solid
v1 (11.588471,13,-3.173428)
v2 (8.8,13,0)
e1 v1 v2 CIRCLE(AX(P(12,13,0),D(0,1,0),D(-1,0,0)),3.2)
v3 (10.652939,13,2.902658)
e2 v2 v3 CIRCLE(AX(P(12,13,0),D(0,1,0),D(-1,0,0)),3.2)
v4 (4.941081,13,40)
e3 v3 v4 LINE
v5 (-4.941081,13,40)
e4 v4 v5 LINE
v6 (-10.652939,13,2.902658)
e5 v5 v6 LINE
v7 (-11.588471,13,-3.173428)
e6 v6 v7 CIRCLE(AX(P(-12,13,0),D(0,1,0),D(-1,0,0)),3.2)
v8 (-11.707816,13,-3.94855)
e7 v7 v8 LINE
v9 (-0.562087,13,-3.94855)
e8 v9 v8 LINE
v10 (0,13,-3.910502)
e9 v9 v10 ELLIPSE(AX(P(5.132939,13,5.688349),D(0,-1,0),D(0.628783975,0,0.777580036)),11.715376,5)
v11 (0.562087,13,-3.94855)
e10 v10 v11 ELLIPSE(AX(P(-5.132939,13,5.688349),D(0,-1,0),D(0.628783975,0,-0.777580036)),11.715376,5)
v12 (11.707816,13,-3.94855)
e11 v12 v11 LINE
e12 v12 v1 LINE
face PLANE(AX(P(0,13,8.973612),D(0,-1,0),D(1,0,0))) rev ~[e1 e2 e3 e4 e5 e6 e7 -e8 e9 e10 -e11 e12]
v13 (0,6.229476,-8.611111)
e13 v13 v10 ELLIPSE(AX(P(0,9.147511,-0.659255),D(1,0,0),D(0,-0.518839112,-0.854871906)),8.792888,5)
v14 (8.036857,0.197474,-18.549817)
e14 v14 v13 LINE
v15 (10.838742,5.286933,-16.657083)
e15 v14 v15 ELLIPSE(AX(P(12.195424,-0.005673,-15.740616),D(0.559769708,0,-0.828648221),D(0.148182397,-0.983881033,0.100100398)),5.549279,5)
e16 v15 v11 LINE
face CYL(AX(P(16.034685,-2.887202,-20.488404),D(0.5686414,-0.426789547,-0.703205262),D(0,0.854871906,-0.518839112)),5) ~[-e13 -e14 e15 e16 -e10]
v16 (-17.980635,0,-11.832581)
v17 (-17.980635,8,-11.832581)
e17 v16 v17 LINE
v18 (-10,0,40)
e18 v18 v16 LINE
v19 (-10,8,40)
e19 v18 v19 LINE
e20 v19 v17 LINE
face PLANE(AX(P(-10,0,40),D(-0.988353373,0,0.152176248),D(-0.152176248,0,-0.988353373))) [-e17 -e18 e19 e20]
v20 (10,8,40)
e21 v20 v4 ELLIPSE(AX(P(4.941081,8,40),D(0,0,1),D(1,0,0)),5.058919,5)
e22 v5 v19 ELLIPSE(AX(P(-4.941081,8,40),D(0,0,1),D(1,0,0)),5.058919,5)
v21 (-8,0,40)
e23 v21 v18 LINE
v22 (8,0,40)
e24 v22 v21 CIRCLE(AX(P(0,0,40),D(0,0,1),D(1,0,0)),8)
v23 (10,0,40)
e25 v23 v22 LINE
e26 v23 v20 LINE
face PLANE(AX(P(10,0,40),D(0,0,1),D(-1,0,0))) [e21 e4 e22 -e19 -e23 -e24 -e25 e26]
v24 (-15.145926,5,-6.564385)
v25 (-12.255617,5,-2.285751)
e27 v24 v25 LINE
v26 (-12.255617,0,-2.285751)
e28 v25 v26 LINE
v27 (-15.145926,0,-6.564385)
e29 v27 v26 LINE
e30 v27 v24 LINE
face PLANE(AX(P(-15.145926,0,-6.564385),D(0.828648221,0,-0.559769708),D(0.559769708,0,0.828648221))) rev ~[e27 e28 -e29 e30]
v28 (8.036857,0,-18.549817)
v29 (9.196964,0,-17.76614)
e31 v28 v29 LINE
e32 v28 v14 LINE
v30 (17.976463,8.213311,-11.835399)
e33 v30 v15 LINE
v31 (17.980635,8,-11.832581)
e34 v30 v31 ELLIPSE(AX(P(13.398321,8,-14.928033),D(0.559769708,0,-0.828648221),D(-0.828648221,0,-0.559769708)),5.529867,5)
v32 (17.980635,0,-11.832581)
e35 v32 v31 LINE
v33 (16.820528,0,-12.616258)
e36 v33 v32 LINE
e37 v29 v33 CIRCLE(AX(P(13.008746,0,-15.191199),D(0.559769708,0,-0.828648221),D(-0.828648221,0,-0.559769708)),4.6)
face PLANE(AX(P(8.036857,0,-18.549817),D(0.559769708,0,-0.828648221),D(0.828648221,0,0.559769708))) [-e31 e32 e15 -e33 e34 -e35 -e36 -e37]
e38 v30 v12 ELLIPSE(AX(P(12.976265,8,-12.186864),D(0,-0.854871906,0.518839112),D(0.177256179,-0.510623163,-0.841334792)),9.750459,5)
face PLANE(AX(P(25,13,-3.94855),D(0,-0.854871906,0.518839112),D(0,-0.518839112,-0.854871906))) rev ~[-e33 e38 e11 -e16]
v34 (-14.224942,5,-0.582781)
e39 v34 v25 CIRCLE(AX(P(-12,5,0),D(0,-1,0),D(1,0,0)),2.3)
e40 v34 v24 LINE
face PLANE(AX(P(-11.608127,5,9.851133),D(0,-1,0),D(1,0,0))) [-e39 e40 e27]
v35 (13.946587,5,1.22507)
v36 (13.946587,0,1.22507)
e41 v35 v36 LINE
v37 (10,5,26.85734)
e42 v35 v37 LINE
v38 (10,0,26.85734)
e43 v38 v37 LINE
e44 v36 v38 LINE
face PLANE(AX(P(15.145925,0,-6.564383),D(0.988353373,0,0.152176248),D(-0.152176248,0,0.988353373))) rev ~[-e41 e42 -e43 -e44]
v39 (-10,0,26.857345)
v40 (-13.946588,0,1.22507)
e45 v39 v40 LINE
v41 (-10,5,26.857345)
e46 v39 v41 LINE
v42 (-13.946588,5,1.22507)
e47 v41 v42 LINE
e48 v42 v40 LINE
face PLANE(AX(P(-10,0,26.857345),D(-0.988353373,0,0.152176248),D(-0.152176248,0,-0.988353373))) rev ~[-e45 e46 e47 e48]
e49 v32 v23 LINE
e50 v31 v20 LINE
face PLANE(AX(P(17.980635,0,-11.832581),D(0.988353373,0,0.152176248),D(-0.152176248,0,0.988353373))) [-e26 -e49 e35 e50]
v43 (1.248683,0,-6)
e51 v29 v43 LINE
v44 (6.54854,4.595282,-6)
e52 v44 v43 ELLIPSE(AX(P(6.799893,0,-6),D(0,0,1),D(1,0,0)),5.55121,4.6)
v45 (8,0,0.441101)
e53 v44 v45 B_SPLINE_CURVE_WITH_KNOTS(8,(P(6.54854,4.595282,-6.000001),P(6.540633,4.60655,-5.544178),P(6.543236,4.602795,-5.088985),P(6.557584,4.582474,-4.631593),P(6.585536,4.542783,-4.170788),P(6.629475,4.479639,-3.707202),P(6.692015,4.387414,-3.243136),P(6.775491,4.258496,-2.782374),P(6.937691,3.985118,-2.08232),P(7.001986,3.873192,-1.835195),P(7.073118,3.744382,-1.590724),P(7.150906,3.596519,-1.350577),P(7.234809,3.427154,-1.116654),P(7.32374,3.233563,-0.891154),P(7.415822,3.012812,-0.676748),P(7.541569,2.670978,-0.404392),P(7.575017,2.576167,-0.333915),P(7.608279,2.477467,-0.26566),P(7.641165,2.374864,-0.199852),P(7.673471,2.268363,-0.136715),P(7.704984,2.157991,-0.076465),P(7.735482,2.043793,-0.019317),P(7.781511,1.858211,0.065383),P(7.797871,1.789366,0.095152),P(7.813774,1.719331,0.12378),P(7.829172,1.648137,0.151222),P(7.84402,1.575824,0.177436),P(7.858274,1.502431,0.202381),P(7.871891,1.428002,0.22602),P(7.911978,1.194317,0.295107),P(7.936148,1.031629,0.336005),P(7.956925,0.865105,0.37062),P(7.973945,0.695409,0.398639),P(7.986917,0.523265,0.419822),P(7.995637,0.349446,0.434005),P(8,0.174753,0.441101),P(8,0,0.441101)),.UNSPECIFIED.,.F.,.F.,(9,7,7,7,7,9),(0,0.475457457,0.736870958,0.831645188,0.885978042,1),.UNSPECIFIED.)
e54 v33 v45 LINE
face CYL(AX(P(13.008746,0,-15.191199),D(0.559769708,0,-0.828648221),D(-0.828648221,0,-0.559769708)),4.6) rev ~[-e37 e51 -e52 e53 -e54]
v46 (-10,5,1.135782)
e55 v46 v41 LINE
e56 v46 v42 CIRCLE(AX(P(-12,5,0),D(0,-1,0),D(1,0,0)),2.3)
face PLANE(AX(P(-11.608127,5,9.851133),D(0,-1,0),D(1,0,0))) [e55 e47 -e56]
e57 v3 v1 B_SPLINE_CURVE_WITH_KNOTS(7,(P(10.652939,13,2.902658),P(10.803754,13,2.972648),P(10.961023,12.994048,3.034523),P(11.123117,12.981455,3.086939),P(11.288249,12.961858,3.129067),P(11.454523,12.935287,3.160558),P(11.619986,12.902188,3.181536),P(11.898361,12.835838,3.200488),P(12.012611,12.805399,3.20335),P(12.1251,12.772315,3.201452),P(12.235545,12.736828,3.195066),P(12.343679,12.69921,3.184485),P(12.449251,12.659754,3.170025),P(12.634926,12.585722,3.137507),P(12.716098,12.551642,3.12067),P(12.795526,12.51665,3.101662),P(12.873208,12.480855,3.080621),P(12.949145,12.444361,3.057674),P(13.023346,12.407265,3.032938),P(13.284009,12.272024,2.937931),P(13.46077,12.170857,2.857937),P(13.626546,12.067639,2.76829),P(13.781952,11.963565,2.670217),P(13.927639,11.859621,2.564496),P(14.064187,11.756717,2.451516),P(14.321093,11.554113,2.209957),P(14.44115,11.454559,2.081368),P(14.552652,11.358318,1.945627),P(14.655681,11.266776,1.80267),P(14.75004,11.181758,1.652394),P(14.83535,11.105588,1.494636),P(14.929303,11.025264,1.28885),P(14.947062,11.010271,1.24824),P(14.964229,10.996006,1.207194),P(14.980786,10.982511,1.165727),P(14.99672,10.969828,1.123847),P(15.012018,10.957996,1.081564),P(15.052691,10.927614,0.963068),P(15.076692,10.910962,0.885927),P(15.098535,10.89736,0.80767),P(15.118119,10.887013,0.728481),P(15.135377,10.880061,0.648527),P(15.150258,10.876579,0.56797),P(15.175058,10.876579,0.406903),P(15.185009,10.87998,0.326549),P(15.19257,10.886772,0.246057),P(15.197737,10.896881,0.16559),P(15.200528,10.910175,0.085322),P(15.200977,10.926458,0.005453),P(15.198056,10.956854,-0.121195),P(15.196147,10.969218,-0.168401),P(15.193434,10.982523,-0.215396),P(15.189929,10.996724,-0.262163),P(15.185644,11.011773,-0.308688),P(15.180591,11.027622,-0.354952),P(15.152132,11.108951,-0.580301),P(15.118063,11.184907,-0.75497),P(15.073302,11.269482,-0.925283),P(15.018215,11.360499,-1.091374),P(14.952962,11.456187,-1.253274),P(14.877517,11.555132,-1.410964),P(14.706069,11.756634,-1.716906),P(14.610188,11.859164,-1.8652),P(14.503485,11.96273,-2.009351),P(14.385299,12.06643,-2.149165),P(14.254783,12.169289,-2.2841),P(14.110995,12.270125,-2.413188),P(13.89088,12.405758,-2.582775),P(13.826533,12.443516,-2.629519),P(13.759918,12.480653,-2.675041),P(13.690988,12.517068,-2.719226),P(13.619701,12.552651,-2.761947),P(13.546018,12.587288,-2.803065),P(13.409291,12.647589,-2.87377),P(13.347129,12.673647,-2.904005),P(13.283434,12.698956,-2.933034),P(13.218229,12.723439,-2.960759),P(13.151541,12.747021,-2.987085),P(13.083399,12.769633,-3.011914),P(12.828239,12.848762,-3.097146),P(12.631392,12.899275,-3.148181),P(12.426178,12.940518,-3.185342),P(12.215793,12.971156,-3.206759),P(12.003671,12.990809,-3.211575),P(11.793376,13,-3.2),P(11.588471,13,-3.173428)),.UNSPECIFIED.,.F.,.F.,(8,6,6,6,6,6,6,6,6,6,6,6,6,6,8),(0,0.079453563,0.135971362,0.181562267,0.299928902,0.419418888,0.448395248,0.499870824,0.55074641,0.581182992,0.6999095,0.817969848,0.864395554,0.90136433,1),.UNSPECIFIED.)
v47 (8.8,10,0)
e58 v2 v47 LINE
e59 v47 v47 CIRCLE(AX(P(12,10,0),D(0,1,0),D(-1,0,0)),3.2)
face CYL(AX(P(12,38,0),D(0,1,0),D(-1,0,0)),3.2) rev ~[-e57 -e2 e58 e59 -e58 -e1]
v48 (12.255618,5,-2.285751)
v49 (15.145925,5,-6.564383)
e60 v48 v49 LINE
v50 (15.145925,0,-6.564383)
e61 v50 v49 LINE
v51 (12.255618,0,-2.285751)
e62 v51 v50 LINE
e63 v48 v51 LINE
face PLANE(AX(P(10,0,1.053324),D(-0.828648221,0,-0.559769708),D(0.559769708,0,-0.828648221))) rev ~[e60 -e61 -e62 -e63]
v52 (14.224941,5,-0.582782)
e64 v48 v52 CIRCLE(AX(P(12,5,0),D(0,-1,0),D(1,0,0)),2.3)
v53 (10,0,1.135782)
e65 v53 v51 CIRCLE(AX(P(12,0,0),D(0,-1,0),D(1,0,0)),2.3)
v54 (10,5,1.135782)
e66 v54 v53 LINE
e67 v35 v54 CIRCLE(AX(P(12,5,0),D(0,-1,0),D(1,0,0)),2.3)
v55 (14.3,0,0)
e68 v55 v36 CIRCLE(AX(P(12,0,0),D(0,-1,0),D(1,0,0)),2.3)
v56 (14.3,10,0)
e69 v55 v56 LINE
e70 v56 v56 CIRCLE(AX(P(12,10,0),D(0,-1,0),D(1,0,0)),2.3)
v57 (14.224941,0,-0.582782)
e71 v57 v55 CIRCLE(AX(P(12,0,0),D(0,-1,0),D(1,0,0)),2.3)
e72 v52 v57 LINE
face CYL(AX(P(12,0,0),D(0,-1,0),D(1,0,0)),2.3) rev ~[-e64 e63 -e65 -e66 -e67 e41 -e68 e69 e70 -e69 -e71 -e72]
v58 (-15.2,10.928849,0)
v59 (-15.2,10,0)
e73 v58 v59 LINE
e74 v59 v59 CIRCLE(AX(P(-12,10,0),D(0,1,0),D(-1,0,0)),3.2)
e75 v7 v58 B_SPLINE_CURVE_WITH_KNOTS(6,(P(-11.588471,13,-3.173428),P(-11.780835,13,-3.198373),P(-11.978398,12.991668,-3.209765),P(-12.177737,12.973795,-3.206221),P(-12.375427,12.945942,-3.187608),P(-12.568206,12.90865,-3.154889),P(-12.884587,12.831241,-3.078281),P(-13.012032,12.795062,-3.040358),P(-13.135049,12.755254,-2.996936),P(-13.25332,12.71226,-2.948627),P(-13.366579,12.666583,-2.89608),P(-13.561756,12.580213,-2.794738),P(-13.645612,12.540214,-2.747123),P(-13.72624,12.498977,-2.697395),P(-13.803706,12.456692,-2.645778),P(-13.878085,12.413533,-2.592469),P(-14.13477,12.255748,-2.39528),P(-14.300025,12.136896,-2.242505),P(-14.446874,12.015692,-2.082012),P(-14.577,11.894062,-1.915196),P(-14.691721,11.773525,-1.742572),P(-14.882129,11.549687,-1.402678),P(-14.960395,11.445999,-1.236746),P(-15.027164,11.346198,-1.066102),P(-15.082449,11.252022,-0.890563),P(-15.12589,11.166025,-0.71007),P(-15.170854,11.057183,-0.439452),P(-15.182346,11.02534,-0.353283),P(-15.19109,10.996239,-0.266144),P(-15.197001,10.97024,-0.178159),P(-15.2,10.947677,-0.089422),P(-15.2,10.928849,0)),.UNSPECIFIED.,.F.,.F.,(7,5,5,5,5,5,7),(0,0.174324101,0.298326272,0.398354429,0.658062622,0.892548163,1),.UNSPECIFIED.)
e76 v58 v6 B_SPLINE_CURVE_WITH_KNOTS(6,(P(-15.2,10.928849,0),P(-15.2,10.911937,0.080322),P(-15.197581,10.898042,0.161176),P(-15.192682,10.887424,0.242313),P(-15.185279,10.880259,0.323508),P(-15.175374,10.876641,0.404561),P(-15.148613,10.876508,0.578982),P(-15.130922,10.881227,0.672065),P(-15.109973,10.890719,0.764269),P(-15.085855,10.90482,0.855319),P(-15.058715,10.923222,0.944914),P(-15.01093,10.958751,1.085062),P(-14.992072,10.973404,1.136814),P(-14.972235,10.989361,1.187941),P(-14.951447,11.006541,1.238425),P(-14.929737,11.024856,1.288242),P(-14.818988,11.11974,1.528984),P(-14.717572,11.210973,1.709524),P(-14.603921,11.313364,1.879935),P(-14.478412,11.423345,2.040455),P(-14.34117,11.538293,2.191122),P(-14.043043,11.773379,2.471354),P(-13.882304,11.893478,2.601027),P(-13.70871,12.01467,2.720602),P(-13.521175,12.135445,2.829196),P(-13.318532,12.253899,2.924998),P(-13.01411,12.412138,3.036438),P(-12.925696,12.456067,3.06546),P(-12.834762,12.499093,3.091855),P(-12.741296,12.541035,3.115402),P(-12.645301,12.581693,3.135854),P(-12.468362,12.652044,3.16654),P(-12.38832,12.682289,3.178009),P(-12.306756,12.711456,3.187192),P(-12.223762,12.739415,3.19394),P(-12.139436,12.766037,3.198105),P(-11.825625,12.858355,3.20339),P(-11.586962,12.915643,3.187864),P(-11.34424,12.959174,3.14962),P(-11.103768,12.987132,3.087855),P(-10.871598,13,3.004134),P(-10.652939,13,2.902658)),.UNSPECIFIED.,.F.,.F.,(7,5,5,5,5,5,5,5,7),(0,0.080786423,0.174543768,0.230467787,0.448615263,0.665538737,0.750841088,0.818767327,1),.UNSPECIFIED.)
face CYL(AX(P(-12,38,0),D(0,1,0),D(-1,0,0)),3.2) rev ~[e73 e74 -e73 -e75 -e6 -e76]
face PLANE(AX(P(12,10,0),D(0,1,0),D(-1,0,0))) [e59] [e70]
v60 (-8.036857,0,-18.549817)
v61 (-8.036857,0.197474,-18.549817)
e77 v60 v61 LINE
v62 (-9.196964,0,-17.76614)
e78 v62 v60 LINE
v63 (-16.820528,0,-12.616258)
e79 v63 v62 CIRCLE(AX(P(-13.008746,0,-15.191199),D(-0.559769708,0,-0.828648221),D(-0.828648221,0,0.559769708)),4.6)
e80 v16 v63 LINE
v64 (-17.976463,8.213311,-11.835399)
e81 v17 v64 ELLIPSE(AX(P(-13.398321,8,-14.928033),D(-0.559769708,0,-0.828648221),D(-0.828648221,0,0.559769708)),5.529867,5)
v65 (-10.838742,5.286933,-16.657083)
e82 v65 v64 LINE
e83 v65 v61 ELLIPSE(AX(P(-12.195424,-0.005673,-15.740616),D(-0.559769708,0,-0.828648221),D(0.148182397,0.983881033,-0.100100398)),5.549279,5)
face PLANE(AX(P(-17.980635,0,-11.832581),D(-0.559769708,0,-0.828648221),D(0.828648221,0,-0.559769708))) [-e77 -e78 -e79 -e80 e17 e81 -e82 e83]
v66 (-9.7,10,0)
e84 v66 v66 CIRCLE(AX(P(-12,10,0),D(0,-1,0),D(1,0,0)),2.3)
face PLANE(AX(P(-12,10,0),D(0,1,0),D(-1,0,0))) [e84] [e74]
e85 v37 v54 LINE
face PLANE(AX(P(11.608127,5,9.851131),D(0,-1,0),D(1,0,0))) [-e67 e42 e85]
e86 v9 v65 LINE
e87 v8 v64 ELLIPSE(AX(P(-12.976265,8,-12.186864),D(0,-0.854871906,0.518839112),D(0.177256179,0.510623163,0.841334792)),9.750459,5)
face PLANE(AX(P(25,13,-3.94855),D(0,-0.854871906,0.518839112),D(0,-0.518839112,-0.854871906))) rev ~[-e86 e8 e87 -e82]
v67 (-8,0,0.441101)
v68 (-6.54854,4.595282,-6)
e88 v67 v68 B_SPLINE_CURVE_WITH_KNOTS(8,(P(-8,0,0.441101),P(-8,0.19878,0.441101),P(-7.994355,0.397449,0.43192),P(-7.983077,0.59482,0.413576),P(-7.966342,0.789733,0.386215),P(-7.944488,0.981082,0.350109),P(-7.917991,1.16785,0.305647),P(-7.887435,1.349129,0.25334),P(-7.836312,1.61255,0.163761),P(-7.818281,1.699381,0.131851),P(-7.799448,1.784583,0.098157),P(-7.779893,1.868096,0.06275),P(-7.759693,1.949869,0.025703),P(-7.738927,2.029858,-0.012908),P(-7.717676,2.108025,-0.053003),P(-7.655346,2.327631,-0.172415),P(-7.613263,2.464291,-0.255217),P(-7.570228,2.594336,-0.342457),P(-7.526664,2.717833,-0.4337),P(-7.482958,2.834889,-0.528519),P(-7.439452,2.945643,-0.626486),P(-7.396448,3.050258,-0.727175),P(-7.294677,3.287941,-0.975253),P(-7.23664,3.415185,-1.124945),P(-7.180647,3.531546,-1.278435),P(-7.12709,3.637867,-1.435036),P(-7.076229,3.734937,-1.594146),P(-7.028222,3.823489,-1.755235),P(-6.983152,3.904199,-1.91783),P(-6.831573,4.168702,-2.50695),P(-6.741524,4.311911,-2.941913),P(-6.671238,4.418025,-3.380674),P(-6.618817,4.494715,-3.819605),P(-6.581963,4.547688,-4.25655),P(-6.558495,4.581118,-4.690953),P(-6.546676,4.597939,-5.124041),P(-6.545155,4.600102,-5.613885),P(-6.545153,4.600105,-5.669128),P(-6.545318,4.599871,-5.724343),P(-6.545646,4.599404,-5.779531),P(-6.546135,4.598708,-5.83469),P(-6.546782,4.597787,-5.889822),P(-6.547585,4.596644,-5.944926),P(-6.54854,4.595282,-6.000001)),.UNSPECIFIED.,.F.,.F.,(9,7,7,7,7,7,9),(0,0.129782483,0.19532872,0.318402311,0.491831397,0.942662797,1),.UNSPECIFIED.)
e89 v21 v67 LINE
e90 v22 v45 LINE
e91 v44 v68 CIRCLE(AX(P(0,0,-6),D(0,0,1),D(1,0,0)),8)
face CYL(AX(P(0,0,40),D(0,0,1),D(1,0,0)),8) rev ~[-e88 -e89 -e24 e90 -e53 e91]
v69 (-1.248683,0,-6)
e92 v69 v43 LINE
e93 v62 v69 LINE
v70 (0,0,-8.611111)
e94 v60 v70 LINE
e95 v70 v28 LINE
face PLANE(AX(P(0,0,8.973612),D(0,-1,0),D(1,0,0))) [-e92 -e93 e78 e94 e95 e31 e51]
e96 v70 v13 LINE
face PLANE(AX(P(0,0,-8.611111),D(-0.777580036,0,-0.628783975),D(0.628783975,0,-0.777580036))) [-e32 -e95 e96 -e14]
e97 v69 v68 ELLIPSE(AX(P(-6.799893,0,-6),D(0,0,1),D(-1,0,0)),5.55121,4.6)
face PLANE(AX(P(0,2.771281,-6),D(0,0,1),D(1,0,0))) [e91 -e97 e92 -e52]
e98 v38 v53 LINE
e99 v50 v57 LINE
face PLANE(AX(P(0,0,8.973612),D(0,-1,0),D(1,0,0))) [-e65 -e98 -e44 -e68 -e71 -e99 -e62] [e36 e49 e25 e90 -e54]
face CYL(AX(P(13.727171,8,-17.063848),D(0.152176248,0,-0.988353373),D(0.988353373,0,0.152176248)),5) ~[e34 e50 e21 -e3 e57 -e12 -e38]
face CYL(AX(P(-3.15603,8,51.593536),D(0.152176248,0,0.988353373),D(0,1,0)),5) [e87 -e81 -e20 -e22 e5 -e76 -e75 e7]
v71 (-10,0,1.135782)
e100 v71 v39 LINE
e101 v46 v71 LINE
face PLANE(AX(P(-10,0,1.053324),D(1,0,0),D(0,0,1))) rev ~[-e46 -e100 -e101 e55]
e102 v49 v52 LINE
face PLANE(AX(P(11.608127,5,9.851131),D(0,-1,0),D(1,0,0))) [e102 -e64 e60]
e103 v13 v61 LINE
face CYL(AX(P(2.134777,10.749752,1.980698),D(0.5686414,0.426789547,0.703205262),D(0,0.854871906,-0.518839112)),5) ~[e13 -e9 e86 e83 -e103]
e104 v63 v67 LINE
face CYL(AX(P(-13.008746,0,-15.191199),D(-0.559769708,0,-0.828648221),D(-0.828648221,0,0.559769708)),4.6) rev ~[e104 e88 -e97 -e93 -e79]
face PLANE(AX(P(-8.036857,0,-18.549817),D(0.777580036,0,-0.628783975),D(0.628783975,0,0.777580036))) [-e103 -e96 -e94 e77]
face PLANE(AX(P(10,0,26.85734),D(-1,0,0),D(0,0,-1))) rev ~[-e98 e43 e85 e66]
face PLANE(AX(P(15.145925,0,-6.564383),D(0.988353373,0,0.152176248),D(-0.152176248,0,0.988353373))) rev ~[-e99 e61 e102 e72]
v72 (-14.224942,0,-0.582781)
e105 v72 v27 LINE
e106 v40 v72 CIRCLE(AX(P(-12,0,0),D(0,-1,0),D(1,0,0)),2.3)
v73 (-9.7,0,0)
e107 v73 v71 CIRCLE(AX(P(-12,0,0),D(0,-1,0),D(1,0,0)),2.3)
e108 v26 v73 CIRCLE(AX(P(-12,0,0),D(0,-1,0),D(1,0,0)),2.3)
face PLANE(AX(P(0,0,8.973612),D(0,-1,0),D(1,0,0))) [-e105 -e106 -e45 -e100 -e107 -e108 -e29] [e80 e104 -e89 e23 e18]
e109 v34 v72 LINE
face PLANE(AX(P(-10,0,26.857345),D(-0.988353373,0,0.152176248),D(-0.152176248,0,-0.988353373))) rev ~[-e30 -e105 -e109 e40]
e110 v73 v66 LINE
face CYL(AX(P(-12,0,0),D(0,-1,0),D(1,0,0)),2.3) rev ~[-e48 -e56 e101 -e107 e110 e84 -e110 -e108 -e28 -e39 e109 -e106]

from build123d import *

# Parameters (mm, degrees)
F0_R          = 2.3
F1_DEPTH      = 13
F3_DEPTH      = 46
F6_DEPTH      = 52.2
F8_DEPTH      = 25
F10_DEPTH     = 25
F11_T1_DEPTH  = 69.4664340584
F11_T3_DEPTH  = 69.4664340584
F11_T8_DEPTH  = 31.9524083705
F11_T13_DEPTH = 31.9524083705
F11_T19_DEPTH = 31.9524083705
F11_T23_DEPTH = 31.9524083705
F15_DEPTH     = 5
F16_DEPTH     = 5
F18_R         = 3.2
F19_DEPTH     = 28


# Not quite as in the source:
# - a fillet or chamfer that OpenCascade refuses, or shapes differently, is made with other operations: its cross-section is extruded or revolved along the edge and cut away or added
# - a feature names something its author has since deleted; it is built from what else it names


with BuildPart() as f1:
    # F0 (on Front) → F1 (new body)
    with BuildSketch(Plane.XZ):
        Polygon((10, 40), (-10, 40), (-17.9806351662, -11.8325809017), (-8.0368565166, -18.5498173996), (0, -8.6111112242), (8.0368565166, -18.5498173996), (17.9806351662, -11.8325809017), align=None)
        with Locations((-12, 0)):
            Circle(F0_R, mode=Mode.SUBTRACT)
        with Locations((12, 0)):
            Circle(F0_R, mode=Mode.SUBTRACT)
    extrude(amount=-F1_DEPTH)

    # F2 (on face) → F3 (cut)
    with BuildSketch(Plane.XY.offset(40)):
        with BuildLine():
            Line((-8, 0), (8, 0))
            ThreePointArc((8, 0), (0, 8), (-8, 0))
        make_face()
    extrude(amount=-F3_DEPTH, mode=Mode.SUBTRACT)

    # F5 (on offset) → F6 (cut)
    with BuildSketch(Plane.YZ.offset(25)):
        Polygon((13, -3.9485500787), (4.1381944902, -18.5498173996), (13, -18.5498173996), align=None)
    extrude(amount=-F6_DEPTH, mode=Mode.SUBTRACT)

    # F7 (on face) → F8 (cut)
    with BuildSketch(Plane(origin=(-11.122658813, 0, -16.4652915326), x_dir=(0.8286482208, 0, -0.5597697082), z_dir=(-0.5597697082, 0, -0.8286482208))):
        with BuildLine():
            ThreePointArc((-6.8761009811, 0), (-2.2761009811, -4.6), (2.3238990189, 0))
            Line((2.3238990189, 0), (-6.8761009811, 0))
        make_face()
    extrude(amount=-F8_DEPTH, mode=Mode.SUBTRACT)

    # F9 (on face) → F10 (cut)
    with BuildSketch(Plane(origin=(11.122658813, 0, -16.4652915326), x_dir=(0.8286482208, 0, 0.5597697082), z_dir=(0.5597697082, 0, -0.8286482208))):
        with BuildLine():
            ThreePointArc((-2.3238990189, 0), (2.2761009811, -4.6), (6.8761009811, 0))
            Line((6.8761009811, 0), (-2.3238990189, 0))
        make_face()
    extrude(amount=-F10_DEPTH, mode=Mode.SUBTRACT)

    # F11: fillet of radius 5 on 4 edges, made by hand

    # F11_s2 → F11_t1 (cut)
    with BuildSketch(Plane(origin=(7.6867833124, 0, 49.9240736631), x_dir=(0, 1, 0), z_dir=(-0.152176248, 0, -0.9883533728))):
        with BuildLine():
            ThreePointArc((13, -10.9705836466), (11.5355339059, -14.5061175525), (8, -15.9705836466))
            Line((8, -15.9705836466), (13, -15.9705836466))
            Line((13, -15.9705836466), (13, -10.9705836466))
        make_face()
    extrude(amount=F11_T1_DEPTH, mode=Mode.SUBTRACT)

    # F11_s4 → F11_t3 (cut)
    with BuildSketch(Plane(origin=(2.8843579817, 0, -18.733310736), x_dir=(0, 1, 0), z_dir=(-0.152176248, 0, 0.9883533728))):
        with BuildLine():
            ThreePointArc((8, -15.9705836466), (11.5355339059, -14.5061175525), (13, -10.9705836466))
            Line((13, -10.9705836466), (13, -15.9705836466))
            Line((13, -15.9705836466), (8, -15.9705836466))
        make_face()
    extrude(amount=F11_T3_DEPTH, mode=Mode.SUBTRACT)


with BuildPart() as f11_tool6:
    # F11_s7 → F11_t8 (new body)
    with BuildSketch(Plane(origin=(4.0911710208, 3.0705977915, 5.0593097692), x_dir=(0.6002776597, -0.7997916799, 0), z_dir=(-0.5686414, -0.4267895471, -0.7032052622))):
        with BuildLine():
            ThreePointArc((-10.7347001393, -7.9787789452), (-7.9821654916, -9.2854915519), (-4.9822833283, -8.7519638303))
            Line((-4.9822833283, -8.7519638303), (-8.1340389445, -10.4154145762))
            Line((-8.1340389445, -10.4154145762), (-10.7347001393, -7.9787789452))
        make_face()
    extrude(amount=F11_T8_DEPTH)

    split(bisect_by=Plane(origin=(-4.2102294585, 0, -3.404568911), x_dir=(0, 1, 0), z_dir=(-0.7775800359, 0, -0.6287839754)), keep=Keep.TOP)


with BuildPart() as f1_1:
    add(f1.part)

    # F11_t5: cut F11_tool6
    add(f11_tool6.part, mode=Mode.SUBTRACT)


with BuildPart() as f11_tool11:
    # F11_s12 → F11_t13 (new body)
    with BuildSketch(Plane(origin=(14.0782912081, -10.566356105, -17.4097919354), x_dir=(-0.6002776597, -0.7997916799, 0), z_dir=(-0.5686414, 0.4267895471, 0.7032052622))):
        with BuildLine():
            ThreePointArc((-10.7347001393, -7.9787789452), (-7.9821654916, -9.2854915519), (-4.9822833283, -8.7519638303))
            Line((-4.9822833283, -8.7519638303), (-8.1340389445, -10.4154145762))
            Line((-8.1340389445, -10.4154145762), (-10.7347001393, -7.9787789452))
        make_face()
    extrude(amount=F11_T13_DEPTH)

    split(bisect_by=Plane(origin=(4.2102294585, 0, -3.404568911), x_dir=(0, 1, 0), z_dir=(0.7775800359, 0, -0.6287839754)), keep=Keep.TOP)


with BuildPart() as f1_2:
    add(f1_1.part)

    # F11_t10: cut F11_tool11
    add(f11_tool11.part, mode=Mode.SUBTRACT)


with BuildPart() as f11_tool17:
    # F11_s18 → F11_t19 (new body)
    with BuildSketch(Plane(origin=(14.0782912081, -10.566356105, -17.4097919354), x_dir=(-0.6002776597, -0.7997916799, 0), z_dir=(-0.5686414, 0.4267895471, 0.7032052622))):
        with BuildLine():
            ThreePointArc((-10.7347001393, -7.9787789452), (-7.9821654916, -9.2854915519), (-4.9822833283, -8.7519638303))
            Line((-4.9822833283, -8.7519638303), (-8.1340389445, -10.4154145762))
            Line((-8.1340389445, -10.4154145762), (-10.7347001393, -7.9787789452))
        make_face()
    extrude(amount=F11_T19_DEPTH)

    split(bisect_by=Plane(origin=(4.2102294585, 0, -3.404568911), x_dir=(0, 1, 0), z_dir=(-0.7775800359, 0, 0.6287839754)), keep=Keep.TOP)


with BuildPart() as f11_tool21:
    # F11_s22 → F11_t23 (new body)
    with BuildSketch(Plane(origin=(4.0911710208, 3.0705977915, 5.0593097692), x_dir=(0.6002776597, -0.7997916799, 0), z_dir=(-0.5686414, -0.4267895471, -0.7032052622))):
        with BuildLine():
            ThreePointArc((-10.7347001393, -7.9787789452), (-7.9821654916, -9.2854915519), (-4.9822833283, -8.7519638303))
            Line((-4.9822833283, -8.7519638303), (-8.1340389445, -10.4154145762))
            Line((-8.1340389445, -10.4154145762), (-10.7347001393, -7.9787789452))
        make_face()
    extrude(amount=F11_T23_DEPTH)

    split(bisect_by=Plane(origin=(-4.2102294585, 0, -3.404568911), x_dir=(0, 1, 0), z_dir=(0.7775800359, 0, 0.6287839754)), keep=Keep.TOP)


with BuildPart() as f11_tool17_1:
    add(f11_tool17.part)

    # F11_t25: intersect F11_tool21
    add(f11_tool21.part, mode=Mode.INTERSECT)


with BuildPart() as f1_3:
    add(f1_2.part)

    # F11_t15: cut F11_tool17
    add(f11_tool17_1.part, mode=Mode.SUBTRACT)

    # F14 (on face) → F15 (cut)
    with BuildSketch(Plane.XZ):
        Polygon((-15.1459260242, -6.5643846345), (-10, 1.0533238305), (-10, 26.8573445146), align=None)
    extrude(amount=-F15_DEPTH, mode=Mode.SUBTRACT)

    # F12 (on face) → F16 (cut)
    with BuildSketch(Plane.XZ):
        Polygon((15.1459253956, -6.5643830302), (10.0000003771, 26.8573395869), (10.0000003771, 1.0533239459), align=None)
    extrude(amount=-F16_DEPTH, mode=Mode.SUBTRACT)

    # F18 (on offset) → F19 (cut)
    with BuildSketch(Plane(origin=(0, 38, 0), x_dir=(-1, 0, 0), z_dir=(0, 1, 0))):
        with Locations((-12, 0)):
            Circle(F18_R)
        with Locations((12, 0)):
            Circle(F18_R)
    extrude(amount=-F19_DEPTH, mode=Mode.SUBTRACT)


solid = f1_3.part
